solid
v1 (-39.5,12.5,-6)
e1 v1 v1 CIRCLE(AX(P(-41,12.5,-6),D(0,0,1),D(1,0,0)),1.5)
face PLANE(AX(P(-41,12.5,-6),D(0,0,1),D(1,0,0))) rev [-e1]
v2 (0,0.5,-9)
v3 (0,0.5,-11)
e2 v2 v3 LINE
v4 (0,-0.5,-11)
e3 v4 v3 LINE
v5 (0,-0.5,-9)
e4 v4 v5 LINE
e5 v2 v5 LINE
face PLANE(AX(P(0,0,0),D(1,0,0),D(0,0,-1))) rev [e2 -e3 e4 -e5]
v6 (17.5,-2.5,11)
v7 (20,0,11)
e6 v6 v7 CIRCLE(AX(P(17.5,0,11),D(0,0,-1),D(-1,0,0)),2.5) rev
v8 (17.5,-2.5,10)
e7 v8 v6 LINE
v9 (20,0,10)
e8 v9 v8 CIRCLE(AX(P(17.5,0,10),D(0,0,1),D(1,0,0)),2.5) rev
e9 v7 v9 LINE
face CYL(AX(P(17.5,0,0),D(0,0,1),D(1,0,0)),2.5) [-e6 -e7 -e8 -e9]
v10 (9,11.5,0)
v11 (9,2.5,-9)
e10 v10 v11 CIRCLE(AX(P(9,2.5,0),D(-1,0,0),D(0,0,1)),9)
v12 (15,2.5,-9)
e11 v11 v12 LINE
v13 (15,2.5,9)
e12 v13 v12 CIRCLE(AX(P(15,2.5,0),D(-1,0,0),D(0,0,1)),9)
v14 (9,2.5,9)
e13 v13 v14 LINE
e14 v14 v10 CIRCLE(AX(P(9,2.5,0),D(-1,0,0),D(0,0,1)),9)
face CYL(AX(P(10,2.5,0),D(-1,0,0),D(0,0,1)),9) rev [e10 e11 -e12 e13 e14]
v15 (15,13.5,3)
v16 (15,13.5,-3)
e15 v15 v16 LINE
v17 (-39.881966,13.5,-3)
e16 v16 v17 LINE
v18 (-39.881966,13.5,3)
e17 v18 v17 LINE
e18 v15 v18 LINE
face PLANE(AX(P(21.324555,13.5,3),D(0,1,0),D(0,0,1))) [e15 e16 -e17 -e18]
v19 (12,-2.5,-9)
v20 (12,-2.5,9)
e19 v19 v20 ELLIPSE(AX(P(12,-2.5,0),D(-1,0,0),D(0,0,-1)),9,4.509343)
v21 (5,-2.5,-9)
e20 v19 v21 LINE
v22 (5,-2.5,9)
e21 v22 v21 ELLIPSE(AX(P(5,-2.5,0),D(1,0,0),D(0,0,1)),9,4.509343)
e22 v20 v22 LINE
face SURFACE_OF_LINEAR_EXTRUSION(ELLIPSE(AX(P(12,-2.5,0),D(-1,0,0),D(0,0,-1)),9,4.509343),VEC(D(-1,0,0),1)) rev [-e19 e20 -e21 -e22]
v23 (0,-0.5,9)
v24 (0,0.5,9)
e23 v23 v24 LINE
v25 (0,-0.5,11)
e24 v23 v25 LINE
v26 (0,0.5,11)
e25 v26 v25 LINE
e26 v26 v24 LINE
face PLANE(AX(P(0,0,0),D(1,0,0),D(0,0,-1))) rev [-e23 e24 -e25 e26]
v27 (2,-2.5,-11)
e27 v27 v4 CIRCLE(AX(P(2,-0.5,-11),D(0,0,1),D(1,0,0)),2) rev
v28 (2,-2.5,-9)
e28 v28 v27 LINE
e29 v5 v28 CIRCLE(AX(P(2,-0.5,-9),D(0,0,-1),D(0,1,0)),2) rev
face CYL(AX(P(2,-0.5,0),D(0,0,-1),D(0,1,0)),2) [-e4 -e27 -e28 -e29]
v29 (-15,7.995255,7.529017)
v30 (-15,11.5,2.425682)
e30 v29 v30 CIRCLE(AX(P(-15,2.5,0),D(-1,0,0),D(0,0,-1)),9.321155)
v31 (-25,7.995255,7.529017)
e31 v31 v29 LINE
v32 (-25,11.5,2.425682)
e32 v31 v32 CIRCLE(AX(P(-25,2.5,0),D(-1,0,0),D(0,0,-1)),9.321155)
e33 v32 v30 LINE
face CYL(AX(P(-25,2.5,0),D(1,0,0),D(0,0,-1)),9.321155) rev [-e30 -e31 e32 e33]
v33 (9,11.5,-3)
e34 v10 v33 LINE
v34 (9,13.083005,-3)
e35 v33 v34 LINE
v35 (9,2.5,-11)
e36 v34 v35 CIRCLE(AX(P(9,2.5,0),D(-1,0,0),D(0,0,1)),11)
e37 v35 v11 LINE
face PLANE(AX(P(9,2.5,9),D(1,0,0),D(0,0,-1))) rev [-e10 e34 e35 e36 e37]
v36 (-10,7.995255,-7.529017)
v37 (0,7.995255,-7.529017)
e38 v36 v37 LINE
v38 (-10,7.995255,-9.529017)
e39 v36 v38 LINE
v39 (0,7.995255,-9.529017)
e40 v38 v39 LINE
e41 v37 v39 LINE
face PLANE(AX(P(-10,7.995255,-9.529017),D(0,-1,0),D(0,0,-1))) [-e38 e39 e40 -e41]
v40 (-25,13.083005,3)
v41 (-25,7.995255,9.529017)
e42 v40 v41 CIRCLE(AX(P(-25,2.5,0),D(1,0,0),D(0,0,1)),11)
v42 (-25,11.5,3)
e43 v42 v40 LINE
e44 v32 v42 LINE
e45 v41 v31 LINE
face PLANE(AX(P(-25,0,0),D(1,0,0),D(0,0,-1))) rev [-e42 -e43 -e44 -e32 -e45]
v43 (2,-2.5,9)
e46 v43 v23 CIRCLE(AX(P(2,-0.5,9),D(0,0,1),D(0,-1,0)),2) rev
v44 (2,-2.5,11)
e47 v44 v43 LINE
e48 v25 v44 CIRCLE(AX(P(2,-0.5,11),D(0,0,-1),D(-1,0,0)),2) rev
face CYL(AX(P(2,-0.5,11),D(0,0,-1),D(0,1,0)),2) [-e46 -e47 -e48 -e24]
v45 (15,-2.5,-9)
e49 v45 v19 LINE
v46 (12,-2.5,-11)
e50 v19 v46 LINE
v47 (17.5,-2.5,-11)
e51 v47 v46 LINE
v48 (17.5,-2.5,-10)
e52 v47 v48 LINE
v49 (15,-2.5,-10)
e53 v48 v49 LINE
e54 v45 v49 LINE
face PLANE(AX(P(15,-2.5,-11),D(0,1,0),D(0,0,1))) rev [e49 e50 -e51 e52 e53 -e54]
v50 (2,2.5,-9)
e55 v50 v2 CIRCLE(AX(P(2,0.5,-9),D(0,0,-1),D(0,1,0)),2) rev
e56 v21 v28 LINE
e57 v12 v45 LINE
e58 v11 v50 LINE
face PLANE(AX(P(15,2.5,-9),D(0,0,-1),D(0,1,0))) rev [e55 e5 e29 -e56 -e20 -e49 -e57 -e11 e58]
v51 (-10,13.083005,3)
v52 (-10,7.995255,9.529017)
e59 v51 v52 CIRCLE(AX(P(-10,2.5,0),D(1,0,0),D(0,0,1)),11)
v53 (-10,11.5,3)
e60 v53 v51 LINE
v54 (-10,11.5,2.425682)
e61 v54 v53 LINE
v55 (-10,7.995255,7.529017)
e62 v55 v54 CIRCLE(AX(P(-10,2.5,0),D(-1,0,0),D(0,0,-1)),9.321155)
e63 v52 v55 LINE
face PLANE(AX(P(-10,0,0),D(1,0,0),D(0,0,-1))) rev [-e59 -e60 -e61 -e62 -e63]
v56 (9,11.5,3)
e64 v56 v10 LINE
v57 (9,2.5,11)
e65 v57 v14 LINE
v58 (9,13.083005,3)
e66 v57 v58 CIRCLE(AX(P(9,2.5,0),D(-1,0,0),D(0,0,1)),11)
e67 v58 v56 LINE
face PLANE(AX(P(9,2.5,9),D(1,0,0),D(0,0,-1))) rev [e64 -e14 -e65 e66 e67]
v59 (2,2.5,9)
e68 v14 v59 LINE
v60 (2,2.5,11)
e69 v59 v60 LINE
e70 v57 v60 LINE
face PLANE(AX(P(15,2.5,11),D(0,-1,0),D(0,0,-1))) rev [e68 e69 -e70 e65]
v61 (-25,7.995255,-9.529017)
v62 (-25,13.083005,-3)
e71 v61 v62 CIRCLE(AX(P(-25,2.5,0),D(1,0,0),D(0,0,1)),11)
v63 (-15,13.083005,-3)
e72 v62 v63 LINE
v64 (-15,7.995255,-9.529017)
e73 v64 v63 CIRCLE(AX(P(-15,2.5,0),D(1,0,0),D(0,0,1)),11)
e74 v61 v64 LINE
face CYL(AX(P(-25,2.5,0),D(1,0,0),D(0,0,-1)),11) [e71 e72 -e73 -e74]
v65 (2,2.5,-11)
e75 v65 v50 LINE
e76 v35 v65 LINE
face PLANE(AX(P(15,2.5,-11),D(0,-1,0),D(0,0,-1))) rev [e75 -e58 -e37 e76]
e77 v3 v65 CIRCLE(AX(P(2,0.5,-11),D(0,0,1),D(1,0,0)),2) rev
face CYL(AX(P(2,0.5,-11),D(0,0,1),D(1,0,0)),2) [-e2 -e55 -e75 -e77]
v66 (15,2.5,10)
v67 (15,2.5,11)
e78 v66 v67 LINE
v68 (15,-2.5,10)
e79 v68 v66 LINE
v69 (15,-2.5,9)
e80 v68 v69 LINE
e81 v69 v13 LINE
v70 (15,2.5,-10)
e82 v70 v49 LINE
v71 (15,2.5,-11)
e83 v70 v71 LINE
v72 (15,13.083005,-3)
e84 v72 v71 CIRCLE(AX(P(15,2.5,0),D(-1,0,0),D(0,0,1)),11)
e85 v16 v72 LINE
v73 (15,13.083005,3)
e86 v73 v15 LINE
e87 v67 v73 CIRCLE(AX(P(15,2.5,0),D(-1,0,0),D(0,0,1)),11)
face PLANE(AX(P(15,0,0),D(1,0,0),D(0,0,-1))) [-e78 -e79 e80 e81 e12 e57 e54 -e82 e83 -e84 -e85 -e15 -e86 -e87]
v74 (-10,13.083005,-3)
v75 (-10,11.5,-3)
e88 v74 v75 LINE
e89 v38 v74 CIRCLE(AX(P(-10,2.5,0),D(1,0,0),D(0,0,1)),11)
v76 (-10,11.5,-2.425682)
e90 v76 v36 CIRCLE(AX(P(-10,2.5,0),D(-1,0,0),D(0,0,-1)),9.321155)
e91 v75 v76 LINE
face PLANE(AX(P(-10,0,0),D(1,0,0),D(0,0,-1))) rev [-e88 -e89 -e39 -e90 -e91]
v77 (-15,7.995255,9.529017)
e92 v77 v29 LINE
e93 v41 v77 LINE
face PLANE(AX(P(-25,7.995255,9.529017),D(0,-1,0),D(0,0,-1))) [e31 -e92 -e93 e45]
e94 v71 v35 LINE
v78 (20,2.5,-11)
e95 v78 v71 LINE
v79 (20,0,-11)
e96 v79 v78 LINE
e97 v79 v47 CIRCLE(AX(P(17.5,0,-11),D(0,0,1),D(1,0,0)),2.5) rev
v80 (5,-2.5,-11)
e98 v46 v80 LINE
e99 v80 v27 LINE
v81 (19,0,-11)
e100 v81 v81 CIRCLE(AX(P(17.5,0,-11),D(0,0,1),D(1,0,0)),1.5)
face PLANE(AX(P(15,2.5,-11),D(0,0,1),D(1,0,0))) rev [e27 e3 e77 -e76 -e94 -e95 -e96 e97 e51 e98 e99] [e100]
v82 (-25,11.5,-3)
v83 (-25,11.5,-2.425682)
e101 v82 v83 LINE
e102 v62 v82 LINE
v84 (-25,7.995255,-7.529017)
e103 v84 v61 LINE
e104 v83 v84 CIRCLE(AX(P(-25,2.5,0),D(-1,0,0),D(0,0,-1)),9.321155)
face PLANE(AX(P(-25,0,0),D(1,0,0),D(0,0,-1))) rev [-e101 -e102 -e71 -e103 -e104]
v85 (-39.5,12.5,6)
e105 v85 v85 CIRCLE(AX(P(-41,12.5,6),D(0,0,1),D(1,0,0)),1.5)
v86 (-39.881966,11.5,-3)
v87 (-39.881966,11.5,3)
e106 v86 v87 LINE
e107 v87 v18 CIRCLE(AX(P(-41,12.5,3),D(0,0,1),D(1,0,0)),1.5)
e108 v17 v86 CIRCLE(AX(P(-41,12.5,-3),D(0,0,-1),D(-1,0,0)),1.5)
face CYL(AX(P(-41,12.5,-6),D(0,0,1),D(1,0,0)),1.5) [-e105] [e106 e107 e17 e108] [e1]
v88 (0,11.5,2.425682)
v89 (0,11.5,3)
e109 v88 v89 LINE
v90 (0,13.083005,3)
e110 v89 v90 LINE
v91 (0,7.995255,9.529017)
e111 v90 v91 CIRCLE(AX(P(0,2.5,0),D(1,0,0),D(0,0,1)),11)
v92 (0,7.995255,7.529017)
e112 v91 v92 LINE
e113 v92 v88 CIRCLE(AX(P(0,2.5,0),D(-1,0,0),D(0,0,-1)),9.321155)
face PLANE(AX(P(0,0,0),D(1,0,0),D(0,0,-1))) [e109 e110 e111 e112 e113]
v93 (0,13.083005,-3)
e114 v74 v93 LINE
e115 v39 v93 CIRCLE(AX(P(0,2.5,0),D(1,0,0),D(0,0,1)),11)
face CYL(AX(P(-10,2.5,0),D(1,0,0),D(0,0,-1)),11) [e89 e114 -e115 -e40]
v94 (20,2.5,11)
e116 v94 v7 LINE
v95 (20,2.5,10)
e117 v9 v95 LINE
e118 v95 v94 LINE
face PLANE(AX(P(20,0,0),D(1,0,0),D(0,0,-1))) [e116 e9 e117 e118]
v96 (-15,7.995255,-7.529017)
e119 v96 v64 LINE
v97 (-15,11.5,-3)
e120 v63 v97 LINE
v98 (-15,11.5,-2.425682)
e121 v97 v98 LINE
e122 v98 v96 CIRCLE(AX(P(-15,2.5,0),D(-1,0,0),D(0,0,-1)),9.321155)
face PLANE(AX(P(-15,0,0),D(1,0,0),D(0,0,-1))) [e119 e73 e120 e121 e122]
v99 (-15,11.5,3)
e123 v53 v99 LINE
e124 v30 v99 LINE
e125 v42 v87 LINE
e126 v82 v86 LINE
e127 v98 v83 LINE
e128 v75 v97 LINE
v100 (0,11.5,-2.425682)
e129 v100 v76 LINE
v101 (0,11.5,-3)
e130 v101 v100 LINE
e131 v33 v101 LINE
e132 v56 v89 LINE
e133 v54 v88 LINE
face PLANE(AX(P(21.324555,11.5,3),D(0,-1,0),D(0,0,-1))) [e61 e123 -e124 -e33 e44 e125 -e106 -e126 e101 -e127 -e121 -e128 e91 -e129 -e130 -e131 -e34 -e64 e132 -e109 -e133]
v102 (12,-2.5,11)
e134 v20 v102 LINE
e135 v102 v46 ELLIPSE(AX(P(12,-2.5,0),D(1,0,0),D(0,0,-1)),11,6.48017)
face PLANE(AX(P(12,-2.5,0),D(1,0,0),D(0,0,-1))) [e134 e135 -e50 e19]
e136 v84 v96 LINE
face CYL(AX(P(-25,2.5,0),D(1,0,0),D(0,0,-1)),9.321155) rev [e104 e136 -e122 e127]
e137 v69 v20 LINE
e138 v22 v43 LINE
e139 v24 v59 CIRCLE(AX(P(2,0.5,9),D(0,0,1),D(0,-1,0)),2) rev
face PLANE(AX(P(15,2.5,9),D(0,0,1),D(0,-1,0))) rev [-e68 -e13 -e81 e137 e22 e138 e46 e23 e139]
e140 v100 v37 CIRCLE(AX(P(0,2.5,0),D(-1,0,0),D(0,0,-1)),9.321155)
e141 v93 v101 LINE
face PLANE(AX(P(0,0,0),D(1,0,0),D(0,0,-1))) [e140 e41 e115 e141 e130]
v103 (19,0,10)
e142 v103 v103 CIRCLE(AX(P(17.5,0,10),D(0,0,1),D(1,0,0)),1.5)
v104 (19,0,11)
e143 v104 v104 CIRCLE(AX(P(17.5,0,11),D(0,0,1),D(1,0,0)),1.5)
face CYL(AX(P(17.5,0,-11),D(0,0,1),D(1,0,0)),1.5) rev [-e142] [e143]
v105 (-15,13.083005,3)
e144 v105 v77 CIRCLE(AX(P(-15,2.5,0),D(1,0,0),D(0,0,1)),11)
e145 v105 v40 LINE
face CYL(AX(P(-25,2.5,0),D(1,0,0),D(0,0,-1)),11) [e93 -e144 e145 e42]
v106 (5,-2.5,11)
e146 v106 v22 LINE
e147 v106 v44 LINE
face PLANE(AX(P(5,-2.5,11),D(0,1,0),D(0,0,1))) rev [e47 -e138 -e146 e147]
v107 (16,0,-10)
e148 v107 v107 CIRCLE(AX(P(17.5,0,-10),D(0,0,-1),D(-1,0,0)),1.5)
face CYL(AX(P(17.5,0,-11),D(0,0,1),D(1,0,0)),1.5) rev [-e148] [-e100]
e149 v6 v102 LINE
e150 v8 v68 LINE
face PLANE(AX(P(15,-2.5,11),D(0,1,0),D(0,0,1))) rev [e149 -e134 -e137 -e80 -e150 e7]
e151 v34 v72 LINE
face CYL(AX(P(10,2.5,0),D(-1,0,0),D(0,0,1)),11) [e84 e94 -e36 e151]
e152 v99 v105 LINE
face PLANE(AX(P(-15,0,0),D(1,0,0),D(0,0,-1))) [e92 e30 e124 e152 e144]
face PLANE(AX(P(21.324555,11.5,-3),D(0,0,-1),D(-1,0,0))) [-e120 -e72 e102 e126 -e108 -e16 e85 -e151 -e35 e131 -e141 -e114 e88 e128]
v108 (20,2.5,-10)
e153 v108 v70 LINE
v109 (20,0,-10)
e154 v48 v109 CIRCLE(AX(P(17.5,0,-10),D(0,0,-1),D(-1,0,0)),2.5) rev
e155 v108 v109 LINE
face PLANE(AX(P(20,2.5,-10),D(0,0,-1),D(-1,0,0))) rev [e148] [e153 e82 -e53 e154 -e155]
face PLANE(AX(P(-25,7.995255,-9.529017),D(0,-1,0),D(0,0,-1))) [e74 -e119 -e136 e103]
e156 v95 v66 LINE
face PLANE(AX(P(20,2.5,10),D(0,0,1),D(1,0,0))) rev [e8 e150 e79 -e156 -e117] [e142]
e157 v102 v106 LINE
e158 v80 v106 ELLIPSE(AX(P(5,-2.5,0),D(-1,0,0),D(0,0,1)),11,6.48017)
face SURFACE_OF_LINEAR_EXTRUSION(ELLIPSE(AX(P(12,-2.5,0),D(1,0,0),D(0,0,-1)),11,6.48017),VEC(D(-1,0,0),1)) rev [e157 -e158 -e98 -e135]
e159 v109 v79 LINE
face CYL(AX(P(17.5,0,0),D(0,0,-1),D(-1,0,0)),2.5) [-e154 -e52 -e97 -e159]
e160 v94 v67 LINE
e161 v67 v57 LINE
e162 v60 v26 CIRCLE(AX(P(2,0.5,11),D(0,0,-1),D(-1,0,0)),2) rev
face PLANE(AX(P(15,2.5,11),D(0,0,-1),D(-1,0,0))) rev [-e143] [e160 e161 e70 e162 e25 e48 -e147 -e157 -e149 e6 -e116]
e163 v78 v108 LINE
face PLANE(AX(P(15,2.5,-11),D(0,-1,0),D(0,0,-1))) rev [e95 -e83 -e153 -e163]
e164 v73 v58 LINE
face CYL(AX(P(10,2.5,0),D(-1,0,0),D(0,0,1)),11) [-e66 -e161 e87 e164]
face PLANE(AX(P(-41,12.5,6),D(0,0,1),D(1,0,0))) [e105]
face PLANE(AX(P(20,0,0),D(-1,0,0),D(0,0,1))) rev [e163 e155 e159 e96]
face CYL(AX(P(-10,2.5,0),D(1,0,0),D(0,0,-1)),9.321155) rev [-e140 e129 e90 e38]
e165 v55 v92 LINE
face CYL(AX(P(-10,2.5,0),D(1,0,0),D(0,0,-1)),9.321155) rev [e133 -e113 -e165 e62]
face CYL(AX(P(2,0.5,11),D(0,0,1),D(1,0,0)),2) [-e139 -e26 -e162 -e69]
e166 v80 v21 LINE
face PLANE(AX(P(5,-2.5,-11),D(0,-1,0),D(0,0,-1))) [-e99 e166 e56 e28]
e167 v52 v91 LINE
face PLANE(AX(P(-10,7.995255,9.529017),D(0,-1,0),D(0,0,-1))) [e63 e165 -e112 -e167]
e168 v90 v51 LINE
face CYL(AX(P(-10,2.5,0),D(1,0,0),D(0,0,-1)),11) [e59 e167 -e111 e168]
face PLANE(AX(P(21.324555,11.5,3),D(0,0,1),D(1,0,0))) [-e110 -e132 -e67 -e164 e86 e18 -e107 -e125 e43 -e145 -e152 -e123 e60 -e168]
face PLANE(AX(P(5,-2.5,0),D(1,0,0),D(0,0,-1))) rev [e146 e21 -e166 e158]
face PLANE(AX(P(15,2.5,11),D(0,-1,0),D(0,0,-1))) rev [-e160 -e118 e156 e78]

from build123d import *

# Parameters (mm, degrees)
SKETCH1_W                = 2
SKETCH1_H                = 5
BOSS_EXTRUDE1_DEPTH      = 15
BOSS_EXTRUDE1_2_DEPTH    = 15
SKETCH2_W                = 1
SKETCH2_H                = 5
BOSS_EXTRUDE2_DEPTH      = 5
CUT_EXTRUDE1_DEPTH       = 30.107559156
CUT_EXTRUDE1_DEPTH_BACK  = 30.107559156
SKETCH3_R                = 1.5
SWEEP1_START             = 9
SWEEP1_DEPTH             = 6
BOSS_EXTRUDE3_DEPTH      = 12
CUT_EXTRUDE2_DEPTH       = 5
FILLET1_R                = 2
BOSS_EXTRUDE6_START      = -6
SKETCH7_W                = 6
SKETCH7_H                = 2
BOSS_EXTRUDE6_DEPTH      = 56
BOSS_EXTRUDE7_DEPTH      = 3
BOSS_EXTRUDE7_DEPTH_BACK = 9
SKETCH8_R                = 1.5
FILLET2_R                = 2.5
BOSS_EXTRUDE10_DEPTH     = 10
LPATTERN1_COUNT          = 2
LPATTERN1_PITCH          = 15


# Read off the part's stored shape, not the designer's step: Sweep1
with BuildPart() as part:
    # Sketch1 → Boss-Extrude1 (new body)
    with BuildSketch(Plane(origin=(0, 0, 0), x_dir=(0, 0, -1), z_dir=(1, 0, 0))):
        with Locations((-10, 0)):
            Rectangle(SKETCH1_W, SKETCH1_H)
    extrude(amount=BOSS_EXTRUDE1_DEPTH)



with BuildPart() as body_2:
    # Sketch1 → Boss-Extrude1 2 (new body)
    with BuildSketch(Plane(origin=(0, 0, 0), x_dir=(0, 0, -1), z_dir=(1, 0, 0))):
        with Locations((10, 0)):
            Rectangle(SKETCH1_W, SKETCH1_H)
    extrude(amount=BOSS_EXTRUDE1_2_DEPTH)


with BuildPart() as part_1:
    add(part.part)

    add(body_2.part)  # Boss-Extrude2 merges body 2
    # Sketch2 → Boss-Extrude2 (add)
    with BuildSketch(Plane(origin=(15, 0, 0), x_dir=(0, 0, -1), z_dir=(1, 0, 0))):
        with Locations((10.5, 0)):
            Rectangle(SKETCH2_W, SKETCH2_H)
        with Locations((-10.5, 0)):
            Rectangle(SKETCH2_W, SKETCH2_H)
    extrude(amount=BOSS_EXTRUDE2_DEPTH)

    # Sketch3 → Cut-Extrude1 (cut, two sides: drawn at the far end of the back side and taken through both)
    with BuildSketch(Plane.XY.offset(-10).offset(-CUT_EXTRUDE1_DEPTH_BACK)):
        with Locations((17.5, 0)):
            Circle(SKETCH3_R)
    extrude(amount=CUT_EXTRUDE1_DEPTH + CUT_EXTRUDE1_DEPTH_BACK, mode=Mode.SUBTRACT)

    # Sweep1 outline → Sweep1 (add)
    with BuildSketch(Plane.YZ.offset(SWEEP1_START)):
        with BuildLine():
            ThreePointArc((2.5, -11), (13.5, 0), (2.5, 11))
            Line((2.5, 11), (2.5, 9))
            ThreePointArc((2.5, 9), (11.5, 0), (2.5, -9))
            Line((2.5, -9), (2.5, -11))
        make_face()
    extrude(amount=SWEEP1_DEPTH)

    # Sketch5 → Boss-Extrude3 (add)
    with BuildSketch(Plane(origin=(0, 0, 0), x_dir=(0, 0, -1), z_dir=(1, 0, 0))):
        with BuildLine():
            Line((-9, -2.5), (-11, -2.5))
            add(Edge.make_bspline(
                [(-11, -2.5), (-11, -8.980170496), (0, -8.980170496)],
                knots=[3.141592654, 3.141592654, 3.141592654, 4.71238898, 4.71238898, 4.71238898], degree=2, weights=[1, 0.707106781, 1]))
            Line((0, -8.980170496), (0, -7.009343108))
            add(Edge.make_bspline(
                [(-9, -2.5), (-9, -7.009343108), (0, -7.009343108)],
                knots=[3.141592654, 3.141592654, 3.141592654, 4.71238898, 4.71238898, 4.71238898], degree=2, weights=[1, 0.707106781, 1]))
        make_face()
    boss_extrude3 = extrude(amount=BOSS_EXTRUDE3_DEPTH)

    # Sketch6 → Cut-Extrude2 (cut)
    with BuildSketch(Plane.ZY):
        with BuildLine():
            Line((11, -2.5), (9, -2.5))
            add(Edge.make_bspline(
                [(0, -7.009343108), (9, -7.009343108), (9, -2.5)],
                knots=[4.71238898, 4.71238898, 4.71238898, 6.283185307, 6.283185307, 6.283185307], degree=2, weights=[1, 0.707106781, 1]))
            Line((0, -7.009343108), (0, -8.980170496))
            add(Edge.make_bspline(
                [(0, -8.980170496), (11, -8.980170496), (11, -2.5)],
                knots=[4.71238898, 4.71238898, 4.71238898, 6.283185307, 6.283185307, 6.283185307], degree=2, weights=[1, 0.707106781, 1]))
        make_face()
    cut_extrude2 = extrude(amount=-CUT_EXTRUDE2_DEPTH, mode=Mode.SUBTRACT)

    # Mirror2: Boss-Extrude3, Cut-Extrude2 across plane
    add(boss_extrude3.mirror(Plane(origin=(12, -8.980170496, 0), x_dir=(1, 0, 0), z_dir=(0, 0, 1))))
    add(cut_extrude2.mirror(Plane(origin=(12, -8.980170496, 0), x_dir=(1, 0, 0), z_dir=(0, 0, 1))), mode=Mode.SUBTRACT)

    # Fillet1
    fillet1_edges = [part_1.edges().sort_by_distance(p)[0] for p in [
        (0, -2.5, -10),
        (0, 2.5, -10),
        (0, 2.5, 10),
        (0, -2.5, 10),
    ]]
    fillet(fillet1_edges, radius=FILLET1_R)

    # Sketch7 → Boss-Extrude6 (add)
    with BuildSketch(Plane.ZY.offset(-9).offset(BOSS_EXTRUDE6_START)):
        with Locations((0, 12.5)):
            Rectangle(SKETCH7_W, SKETCH7_H)
    extrude(amount=BOSS_EXTRUDE6_DEPTH)

    # Sketch8 → Boss-Extrude7 (add, two sides: drawn at the far end of the back side and taken through both)
    with BuildSketch(Plane.XY.offset(3).offset(-BOSS_EXTRUDE7_DEPTH_BACK)):
        with Locations((-41, 12.5)):
            Circle(SKETCH8_R)
    extrude(amount=BOSS_EXTRUDE7_DEPTH + BOSS_EXTRUDE7_DEPTH_BACK)

    # Fillet2
    fillet2_edges = [part_1.edges().sort_by_distance(p)[0] for p in [
        (20, -2.5, -10.5),
        (20, -2.5, 10.5),
    ]]
    fillet(fillet2_edges, radius=FILLET2_R)

    # 3DSketch3 → Boss-Extrude10 (add)
    with BuildSketch(Plane(origin=(-10, 7.995255445, 9.529017137), x_dir=(0, 0, -1), z_dir=(1, 0, 0))):
        with BuildLine():
            Line((0, 0), (2, 0))
            ThreePointArc((2, 0), (9.529017137, 3.825899604), (17.058034273, 0))
            Line((17.058034273, 0), (19.058034273, 0))
            ThreePointArc((19.058034273, 0), (15.031388903, 4.029654263), (9.529017137, 5.504744555))
            ThreePointArc((9.529017137, 5.504744555), (4.026645371, 4.029654263), (0, 0))
        make_face()
    boss_extrude10 = extrude(amount=BOSS_EXTRUDE10_DEPTH)

    # LPattern1: Boss-Extrude10 ×2
    with Locations(*[(-i * LPATTERN1_PITCH, 0, 0) for i in range(1, LPATTERN1_COUNT)]):
        add(boss_extrude10)


solid = part_1.part
